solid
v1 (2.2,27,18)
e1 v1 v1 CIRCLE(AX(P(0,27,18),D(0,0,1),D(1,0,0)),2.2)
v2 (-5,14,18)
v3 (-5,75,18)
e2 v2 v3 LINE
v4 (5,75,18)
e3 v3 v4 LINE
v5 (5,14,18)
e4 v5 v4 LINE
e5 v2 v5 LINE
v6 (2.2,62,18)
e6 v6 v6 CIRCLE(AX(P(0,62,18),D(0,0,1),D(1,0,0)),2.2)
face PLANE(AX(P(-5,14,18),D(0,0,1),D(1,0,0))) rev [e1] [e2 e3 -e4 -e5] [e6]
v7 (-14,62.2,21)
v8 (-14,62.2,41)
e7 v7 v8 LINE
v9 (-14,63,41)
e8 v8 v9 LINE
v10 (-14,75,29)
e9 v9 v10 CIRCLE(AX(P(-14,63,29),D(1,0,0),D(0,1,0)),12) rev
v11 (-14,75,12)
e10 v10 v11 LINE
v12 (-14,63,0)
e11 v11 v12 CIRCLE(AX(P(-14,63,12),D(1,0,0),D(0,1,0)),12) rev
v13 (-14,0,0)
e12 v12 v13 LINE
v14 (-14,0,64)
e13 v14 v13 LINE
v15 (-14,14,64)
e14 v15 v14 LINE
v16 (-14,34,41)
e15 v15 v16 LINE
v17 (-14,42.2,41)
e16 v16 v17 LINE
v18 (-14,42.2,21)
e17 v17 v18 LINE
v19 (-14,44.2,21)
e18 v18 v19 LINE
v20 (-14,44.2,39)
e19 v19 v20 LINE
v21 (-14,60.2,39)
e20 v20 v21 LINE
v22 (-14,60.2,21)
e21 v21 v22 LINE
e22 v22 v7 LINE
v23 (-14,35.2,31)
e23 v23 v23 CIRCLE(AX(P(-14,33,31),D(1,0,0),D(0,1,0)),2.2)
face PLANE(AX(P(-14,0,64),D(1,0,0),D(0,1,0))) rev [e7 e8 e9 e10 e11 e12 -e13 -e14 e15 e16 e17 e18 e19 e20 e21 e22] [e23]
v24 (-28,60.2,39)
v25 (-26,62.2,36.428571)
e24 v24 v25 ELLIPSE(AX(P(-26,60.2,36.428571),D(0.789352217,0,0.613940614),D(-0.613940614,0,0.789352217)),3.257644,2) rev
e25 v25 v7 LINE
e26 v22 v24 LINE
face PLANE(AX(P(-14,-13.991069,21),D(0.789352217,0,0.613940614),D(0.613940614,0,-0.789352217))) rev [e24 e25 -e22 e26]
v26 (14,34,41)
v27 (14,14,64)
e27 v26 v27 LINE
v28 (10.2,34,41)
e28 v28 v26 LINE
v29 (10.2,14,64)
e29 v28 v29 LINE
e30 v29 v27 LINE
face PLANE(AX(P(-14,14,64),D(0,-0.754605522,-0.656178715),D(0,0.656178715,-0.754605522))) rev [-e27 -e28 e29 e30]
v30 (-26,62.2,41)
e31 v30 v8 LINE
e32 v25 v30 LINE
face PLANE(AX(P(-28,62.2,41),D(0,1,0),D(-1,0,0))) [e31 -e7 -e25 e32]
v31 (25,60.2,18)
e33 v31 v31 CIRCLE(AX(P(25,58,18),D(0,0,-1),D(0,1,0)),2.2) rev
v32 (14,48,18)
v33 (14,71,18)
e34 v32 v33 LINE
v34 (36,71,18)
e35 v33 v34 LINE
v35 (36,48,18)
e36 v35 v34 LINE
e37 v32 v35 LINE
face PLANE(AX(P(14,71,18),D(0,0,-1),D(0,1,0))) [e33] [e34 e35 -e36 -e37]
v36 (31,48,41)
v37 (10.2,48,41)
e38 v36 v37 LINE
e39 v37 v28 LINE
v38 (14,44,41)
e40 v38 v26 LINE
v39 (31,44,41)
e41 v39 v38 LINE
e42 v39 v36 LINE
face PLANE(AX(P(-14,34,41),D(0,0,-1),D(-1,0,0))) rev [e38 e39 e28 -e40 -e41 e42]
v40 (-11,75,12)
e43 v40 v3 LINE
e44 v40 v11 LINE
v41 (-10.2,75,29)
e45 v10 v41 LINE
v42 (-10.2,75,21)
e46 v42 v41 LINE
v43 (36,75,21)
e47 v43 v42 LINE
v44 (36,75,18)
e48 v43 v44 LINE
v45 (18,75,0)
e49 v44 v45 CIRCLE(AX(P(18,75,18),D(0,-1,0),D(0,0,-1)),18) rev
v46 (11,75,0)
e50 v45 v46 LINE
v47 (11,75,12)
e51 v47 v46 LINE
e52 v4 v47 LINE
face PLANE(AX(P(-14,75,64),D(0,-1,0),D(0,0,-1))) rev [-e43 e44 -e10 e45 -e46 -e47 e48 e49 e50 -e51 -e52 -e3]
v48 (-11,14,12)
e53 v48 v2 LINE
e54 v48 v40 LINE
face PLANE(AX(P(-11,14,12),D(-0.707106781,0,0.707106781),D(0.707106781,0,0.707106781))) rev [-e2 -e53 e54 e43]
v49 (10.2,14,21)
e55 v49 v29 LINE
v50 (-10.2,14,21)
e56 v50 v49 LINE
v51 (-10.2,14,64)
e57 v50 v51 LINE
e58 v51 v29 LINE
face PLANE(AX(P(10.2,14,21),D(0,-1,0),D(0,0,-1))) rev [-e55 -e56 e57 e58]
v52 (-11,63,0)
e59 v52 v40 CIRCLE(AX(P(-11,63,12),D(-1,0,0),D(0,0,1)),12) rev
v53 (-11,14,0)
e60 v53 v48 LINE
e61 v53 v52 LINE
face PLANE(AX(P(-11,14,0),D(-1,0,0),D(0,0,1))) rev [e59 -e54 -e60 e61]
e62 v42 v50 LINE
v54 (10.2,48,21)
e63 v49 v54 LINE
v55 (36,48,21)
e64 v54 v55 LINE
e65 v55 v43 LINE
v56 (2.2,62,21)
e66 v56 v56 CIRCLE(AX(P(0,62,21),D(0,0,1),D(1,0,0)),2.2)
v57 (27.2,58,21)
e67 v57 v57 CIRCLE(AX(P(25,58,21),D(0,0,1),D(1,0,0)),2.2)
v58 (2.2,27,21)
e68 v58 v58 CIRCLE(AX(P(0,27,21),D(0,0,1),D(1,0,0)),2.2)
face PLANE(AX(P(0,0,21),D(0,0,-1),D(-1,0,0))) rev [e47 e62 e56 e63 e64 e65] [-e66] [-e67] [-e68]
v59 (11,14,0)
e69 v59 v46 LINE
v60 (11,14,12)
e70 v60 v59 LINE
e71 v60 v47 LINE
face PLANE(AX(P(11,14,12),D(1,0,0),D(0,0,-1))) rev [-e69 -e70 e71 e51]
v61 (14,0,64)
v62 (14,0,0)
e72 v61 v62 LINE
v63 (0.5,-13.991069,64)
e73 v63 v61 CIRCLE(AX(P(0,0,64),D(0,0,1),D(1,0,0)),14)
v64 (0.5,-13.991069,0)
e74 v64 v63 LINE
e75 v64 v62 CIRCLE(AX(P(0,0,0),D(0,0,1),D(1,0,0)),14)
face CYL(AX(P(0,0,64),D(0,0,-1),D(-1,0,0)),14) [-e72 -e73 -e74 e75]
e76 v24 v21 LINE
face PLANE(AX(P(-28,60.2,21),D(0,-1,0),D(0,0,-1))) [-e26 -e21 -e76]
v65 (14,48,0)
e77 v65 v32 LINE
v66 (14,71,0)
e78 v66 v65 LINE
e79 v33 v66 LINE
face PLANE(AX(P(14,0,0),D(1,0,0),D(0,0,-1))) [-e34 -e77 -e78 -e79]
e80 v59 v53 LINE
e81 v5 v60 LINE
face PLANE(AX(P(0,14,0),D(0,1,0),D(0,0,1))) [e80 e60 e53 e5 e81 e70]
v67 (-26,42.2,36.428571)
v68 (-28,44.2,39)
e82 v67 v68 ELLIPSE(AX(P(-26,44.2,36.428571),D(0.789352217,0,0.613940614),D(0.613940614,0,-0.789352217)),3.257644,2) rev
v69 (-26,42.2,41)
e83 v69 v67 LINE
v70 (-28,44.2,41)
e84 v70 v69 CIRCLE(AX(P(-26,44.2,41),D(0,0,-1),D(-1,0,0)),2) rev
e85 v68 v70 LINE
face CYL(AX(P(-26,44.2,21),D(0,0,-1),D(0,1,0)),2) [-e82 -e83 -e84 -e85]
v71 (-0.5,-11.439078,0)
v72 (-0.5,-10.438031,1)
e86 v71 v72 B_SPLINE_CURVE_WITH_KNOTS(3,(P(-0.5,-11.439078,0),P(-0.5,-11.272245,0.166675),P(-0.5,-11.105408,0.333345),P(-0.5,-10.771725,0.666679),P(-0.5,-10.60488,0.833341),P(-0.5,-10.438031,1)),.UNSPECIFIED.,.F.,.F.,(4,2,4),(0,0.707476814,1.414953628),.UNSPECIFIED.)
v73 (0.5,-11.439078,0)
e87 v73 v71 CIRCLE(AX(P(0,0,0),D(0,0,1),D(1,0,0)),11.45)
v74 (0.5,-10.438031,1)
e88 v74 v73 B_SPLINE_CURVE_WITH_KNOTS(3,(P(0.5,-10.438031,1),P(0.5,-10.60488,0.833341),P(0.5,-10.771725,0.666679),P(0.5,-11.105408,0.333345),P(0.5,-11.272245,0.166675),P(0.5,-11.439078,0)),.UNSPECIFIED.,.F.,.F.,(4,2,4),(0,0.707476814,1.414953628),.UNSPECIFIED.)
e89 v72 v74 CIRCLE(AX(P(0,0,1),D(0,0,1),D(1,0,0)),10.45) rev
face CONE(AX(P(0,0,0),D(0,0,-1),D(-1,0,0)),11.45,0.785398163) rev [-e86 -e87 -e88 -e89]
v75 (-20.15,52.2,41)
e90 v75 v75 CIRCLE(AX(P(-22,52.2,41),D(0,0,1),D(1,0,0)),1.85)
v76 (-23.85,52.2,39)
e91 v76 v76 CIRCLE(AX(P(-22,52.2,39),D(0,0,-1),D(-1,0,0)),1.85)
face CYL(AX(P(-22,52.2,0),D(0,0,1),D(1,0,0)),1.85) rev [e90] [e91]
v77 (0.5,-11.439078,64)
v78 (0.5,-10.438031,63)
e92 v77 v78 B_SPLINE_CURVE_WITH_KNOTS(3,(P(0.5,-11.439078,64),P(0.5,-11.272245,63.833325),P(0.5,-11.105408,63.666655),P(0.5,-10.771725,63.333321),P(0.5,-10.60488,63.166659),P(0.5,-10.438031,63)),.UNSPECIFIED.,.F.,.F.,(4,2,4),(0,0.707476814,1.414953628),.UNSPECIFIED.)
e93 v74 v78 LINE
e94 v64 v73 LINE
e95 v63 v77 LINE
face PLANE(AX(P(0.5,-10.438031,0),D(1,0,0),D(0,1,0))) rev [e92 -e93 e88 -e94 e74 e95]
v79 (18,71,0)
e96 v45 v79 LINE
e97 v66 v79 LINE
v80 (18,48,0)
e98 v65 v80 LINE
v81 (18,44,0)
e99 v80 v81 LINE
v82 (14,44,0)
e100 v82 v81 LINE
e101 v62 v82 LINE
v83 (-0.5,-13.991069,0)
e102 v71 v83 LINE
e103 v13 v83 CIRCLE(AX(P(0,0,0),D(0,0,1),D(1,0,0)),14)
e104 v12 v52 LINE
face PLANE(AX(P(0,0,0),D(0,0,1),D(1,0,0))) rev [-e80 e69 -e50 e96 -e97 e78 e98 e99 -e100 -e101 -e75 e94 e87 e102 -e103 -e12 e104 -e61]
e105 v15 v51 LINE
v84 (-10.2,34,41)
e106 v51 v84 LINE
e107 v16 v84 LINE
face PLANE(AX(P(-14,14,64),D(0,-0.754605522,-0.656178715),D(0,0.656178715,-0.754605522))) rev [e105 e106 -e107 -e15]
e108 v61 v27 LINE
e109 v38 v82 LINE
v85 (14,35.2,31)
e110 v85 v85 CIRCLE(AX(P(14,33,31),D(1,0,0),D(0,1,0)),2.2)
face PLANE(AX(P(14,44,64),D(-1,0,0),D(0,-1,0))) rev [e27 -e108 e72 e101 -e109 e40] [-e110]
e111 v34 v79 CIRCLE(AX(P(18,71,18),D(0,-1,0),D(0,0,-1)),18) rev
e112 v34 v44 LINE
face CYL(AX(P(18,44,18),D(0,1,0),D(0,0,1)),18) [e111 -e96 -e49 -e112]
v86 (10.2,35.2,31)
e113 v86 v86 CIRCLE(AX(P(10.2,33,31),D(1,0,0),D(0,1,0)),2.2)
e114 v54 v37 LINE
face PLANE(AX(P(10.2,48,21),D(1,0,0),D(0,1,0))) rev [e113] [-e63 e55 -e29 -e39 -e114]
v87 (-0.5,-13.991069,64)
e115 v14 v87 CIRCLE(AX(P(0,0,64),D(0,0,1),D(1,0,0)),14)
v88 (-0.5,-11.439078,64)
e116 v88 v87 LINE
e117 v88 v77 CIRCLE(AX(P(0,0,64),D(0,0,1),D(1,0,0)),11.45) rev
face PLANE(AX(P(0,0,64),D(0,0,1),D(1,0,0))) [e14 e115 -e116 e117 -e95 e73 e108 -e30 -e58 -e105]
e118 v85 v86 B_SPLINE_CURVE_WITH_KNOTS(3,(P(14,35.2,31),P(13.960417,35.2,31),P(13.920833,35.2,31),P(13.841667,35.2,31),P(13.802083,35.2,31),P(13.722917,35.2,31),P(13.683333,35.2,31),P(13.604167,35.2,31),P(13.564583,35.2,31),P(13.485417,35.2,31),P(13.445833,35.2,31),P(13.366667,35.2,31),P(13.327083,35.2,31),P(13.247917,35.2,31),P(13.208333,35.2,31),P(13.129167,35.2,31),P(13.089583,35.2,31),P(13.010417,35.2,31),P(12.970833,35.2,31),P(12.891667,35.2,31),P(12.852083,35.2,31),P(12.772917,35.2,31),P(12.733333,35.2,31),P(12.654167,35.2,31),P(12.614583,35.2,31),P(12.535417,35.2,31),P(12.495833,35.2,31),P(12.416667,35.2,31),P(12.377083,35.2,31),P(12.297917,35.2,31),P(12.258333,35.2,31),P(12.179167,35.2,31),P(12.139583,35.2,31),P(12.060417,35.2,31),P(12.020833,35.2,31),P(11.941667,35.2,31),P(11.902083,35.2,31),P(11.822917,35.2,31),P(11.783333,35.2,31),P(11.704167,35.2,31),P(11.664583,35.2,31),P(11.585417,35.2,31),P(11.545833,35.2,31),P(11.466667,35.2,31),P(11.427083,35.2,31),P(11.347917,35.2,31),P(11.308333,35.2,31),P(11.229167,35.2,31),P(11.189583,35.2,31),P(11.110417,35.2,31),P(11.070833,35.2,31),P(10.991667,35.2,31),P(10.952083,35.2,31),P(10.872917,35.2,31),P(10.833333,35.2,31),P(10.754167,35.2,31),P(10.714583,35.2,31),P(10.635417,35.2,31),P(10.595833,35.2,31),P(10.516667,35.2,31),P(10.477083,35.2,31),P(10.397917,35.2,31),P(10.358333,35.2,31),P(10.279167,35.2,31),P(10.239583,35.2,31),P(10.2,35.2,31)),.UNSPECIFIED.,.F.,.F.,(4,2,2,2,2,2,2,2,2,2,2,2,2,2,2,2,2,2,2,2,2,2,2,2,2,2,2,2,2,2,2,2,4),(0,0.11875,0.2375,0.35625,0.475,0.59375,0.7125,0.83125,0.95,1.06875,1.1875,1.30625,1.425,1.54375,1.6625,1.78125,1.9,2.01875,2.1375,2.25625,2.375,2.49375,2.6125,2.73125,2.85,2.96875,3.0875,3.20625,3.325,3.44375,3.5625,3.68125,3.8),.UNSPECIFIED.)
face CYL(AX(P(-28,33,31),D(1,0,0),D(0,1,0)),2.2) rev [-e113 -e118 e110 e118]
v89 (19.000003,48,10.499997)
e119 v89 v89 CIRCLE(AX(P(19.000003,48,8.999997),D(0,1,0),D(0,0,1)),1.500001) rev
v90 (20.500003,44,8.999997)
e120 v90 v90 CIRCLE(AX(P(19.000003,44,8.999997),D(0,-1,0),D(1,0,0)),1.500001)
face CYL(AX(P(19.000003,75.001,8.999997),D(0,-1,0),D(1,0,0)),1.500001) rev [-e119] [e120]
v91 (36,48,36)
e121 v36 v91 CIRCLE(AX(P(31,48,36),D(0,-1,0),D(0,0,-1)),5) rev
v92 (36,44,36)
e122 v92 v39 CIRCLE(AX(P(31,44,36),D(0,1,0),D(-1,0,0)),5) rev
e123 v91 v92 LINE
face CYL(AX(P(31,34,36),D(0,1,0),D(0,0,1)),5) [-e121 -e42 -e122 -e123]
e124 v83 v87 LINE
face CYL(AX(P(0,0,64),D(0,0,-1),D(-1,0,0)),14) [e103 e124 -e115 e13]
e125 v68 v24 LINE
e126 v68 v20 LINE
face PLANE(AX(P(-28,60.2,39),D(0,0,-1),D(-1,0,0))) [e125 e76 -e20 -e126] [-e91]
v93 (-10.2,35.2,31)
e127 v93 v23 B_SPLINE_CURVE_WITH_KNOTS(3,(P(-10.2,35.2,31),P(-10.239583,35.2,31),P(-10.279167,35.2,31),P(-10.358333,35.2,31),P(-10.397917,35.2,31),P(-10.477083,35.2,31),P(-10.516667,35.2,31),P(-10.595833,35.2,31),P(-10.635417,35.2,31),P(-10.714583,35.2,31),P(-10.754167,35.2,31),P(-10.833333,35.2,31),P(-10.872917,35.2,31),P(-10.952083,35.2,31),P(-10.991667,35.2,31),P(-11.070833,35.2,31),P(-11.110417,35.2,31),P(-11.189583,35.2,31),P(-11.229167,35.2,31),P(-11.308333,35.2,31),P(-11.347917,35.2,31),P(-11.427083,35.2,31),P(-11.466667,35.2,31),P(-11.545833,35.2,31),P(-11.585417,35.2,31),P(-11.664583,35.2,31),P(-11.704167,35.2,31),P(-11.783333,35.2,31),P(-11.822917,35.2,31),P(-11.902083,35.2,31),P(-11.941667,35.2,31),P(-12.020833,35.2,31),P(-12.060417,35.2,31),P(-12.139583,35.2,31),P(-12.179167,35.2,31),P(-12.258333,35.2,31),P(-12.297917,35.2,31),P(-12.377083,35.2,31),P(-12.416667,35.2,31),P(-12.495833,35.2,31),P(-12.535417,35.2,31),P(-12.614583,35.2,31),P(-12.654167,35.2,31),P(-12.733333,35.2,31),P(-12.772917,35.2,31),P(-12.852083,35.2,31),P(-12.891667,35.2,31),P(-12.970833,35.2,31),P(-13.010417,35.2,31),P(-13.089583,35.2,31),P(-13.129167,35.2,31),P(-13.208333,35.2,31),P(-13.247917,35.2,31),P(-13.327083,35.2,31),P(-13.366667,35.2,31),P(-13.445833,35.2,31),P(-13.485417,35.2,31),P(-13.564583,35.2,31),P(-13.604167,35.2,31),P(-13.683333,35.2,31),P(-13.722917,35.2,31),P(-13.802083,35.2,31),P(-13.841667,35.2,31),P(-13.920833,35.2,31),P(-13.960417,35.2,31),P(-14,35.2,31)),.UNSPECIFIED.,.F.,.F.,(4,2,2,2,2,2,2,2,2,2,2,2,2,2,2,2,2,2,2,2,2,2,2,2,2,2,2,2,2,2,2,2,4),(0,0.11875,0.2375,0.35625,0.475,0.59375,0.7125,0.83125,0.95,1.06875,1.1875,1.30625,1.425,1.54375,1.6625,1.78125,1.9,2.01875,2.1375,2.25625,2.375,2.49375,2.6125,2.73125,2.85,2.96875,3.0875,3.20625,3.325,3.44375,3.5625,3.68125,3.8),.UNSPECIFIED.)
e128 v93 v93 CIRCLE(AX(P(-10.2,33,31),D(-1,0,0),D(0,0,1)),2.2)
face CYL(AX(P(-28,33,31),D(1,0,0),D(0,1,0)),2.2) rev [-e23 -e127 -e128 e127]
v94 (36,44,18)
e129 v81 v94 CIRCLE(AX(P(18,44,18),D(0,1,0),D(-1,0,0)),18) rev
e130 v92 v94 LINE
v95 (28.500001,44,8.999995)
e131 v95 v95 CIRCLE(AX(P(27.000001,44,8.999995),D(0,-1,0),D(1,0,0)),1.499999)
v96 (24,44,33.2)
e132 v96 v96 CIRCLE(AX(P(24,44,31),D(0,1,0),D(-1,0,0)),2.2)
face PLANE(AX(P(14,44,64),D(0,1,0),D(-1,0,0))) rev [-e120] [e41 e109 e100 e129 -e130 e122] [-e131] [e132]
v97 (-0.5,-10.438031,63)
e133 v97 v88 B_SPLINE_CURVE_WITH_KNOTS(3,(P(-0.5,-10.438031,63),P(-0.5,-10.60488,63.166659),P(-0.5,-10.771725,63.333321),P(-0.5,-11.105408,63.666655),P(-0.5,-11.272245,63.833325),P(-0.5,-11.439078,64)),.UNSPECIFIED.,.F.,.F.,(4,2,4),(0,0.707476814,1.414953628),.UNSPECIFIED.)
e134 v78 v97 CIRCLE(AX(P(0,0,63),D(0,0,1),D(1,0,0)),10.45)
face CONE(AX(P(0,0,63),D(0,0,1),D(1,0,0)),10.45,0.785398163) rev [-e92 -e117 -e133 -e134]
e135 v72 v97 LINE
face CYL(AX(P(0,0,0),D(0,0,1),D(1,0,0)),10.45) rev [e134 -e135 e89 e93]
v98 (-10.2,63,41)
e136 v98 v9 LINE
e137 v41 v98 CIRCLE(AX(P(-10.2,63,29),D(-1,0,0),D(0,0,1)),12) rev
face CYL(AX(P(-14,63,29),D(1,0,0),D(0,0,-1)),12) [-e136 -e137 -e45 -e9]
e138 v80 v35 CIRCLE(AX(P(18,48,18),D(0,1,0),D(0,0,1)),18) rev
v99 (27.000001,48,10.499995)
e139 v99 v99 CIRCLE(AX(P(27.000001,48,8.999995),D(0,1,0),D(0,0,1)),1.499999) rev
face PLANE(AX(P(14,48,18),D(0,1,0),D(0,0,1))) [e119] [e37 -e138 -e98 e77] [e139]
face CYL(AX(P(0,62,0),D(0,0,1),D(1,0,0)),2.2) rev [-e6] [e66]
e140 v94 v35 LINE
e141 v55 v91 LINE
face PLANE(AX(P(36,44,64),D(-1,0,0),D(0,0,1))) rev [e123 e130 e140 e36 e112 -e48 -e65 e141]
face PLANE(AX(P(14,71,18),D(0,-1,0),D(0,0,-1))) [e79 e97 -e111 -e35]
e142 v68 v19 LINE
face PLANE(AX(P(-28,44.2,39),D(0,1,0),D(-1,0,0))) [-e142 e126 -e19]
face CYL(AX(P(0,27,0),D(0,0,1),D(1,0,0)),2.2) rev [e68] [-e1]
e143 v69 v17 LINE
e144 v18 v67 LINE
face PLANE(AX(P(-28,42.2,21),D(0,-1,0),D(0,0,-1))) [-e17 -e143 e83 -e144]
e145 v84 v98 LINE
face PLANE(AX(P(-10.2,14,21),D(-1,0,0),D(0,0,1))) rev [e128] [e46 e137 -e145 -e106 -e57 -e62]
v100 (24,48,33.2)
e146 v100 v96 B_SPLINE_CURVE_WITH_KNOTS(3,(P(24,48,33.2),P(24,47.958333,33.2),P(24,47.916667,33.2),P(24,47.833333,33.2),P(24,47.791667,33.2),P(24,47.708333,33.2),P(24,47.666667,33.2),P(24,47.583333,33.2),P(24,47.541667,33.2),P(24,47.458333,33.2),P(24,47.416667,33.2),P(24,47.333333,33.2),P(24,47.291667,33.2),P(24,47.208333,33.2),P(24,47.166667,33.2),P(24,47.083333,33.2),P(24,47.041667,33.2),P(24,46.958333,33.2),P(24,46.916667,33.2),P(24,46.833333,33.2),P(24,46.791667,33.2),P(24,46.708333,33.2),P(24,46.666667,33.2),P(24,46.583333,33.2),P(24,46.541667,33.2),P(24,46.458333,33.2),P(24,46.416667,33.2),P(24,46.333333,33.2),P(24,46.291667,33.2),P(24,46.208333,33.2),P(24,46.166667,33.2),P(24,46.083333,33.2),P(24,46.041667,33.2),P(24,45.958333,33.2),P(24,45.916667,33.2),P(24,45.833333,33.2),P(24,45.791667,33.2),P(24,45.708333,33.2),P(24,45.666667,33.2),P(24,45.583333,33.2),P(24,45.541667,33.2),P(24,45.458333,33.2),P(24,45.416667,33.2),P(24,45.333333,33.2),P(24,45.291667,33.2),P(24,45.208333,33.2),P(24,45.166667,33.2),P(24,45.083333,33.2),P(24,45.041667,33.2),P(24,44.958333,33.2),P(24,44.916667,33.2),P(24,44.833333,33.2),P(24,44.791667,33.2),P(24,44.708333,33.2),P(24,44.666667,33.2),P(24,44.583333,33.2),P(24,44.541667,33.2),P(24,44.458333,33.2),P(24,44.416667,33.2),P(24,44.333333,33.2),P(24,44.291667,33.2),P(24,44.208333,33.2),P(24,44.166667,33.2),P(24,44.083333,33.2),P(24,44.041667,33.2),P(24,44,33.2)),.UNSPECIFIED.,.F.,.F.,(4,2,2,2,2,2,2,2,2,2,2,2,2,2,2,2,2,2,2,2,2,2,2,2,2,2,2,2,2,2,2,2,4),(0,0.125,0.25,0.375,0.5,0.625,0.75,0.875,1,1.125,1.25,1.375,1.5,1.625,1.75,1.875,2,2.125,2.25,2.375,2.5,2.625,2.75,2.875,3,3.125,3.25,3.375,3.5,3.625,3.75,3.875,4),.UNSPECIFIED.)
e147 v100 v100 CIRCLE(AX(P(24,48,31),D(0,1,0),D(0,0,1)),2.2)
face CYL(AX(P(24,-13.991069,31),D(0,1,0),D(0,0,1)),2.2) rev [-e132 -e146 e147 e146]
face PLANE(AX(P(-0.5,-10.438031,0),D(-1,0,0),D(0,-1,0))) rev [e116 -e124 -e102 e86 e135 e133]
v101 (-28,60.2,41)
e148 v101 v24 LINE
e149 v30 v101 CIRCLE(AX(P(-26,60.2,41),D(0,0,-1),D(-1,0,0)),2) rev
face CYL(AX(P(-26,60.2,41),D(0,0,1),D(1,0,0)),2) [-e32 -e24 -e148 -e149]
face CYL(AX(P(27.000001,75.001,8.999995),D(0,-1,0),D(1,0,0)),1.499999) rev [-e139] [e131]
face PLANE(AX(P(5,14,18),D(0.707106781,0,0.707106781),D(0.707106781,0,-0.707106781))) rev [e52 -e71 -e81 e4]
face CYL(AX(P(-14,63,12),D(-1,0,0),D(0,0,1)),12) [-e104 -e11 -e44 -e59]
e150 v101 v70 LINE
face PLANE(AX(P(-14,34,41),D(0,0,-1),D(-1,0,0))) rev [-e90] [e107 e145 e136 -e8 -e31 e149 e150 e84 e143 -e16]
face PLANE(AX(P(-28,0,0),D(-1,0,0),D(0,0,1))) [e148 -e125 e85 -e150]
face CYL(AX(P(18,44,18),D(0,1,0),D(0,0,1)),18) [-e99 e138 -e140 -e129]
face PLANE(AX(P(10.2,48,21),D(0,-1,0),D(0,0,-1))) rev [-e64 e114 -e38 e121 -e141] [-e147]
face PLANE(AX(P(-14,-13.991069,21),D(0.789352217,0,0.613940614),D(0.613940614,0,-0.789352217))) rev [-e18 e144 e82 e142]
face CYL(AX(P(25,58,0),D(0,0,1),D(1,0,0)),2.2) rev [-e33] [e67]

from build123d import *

# Parameters (mm, degrees)
BOSS_EXTRUDE1_DEPTH     = 64
CUT_EXTRUDE1_DEPTH      = 61
CUT_EXTRUDE2_DEPTH      = 103.493902258
CUT_EXTRUDE2_DEPTH_BACK = 103.493902258
CUT_EXTRUDE3_DEPTH      = 43
CUT_EXTRUDE4_DEPTH      = 105.961897849
CHAMFER1_SIZE           = 1
SKETCH6_R               = 2.2
CUT_EXTRUDE5_DEPTH      = 94.648278148
BOSS_EXTRUDE2_DEPTH     = 14
CUT_EXTRUDE6_DEPTH      = 106.81625079
SKETCH9_R               = 1.85
CUT_EXTRUDE7_DEPTH      = 93.746967605
FILLET1_R               = 2
FILLET2_R               = 12
SKETCH10_R              = 2.2
CUT_EXTRUDE8_DEPTH      = 108.168092266
FILLET3_R               = 5
FILLET4_START           = 44
FILLET4_DEPTH           = 31
SKETCH11_R              = 2.2
CUT_EXTRUDE9_DEPTH      = 97.098348533
SKETCH12_W              = 18
SKETCH12_H              = 23
CUT_EXTRUDE10_DEPTH     = 22
CUT_EXTRUDE11_REACH     = 95.568
SKETCH13_R              = 1.500000659
SKETCH13_R_2            = 1.499999352


with BuildPart() as part:
    # Sketch1 → Boss-Extrude1 (new body)
    with BuildSketch(Plane.XY):
        with BuildLine():
            Line((-14, 0), (-14, 75))
            Line((-14, 75), (36, 75))
            Line((36, 75), (36, 44))
            Line((36, 44), (14, 44))
            Line((14, 44), (14, 0))
            ThreePointArc((14, 0), (0, -14), (-14, 0))
        make_face()
    extrude(amount=BOSS_EXTRUDE1_DEPTH)

    # Sketch2 → Cut-Extrude1 (cut)
    with BuildSketch(Plane(origin=(0, 75, 0), x_dir=(1, 0, 0), z_dir=(0, 1, 0))):
        Polygon((-11, 0), (-11, -12), (-5, -18), (5, -18), (11, -12), (11, 0), align=None)
    extrude(amount=-CUT_EXTRUDE1_DEPTH, mode=Mode.SUBTRACT)

    # Sketch3 → Cut-Extrude2 (cut, two sides: drawn at the far end of the back side and taken through both)
    with BuildSketch(Plane(origin=(14, 0, 0), x_dir=(0, 0, -1), z_dir=(1, 0, 0)).offset(-CUT_EXTRUDE2_DEPTH_BACK)):
        Polygon((-64, 14), (-41, 34), (-41, 75), (-64, 75), align=None)
    extrude(amount=CUT_EXTRUDE2_DEPTH + CUT_EXTRUDE2_DEPTH_BACK, mode=Mode.SUBTRACT)

    # Sketch4 → Cut-Extrude3 (cut)
    with BuildSketch(Plane.XY.offset(64)):
        Polygon((-10.2, 14), (-10.2, 75), (36, 75), (36, 48), (10.2, 48), (10.2, 14), align=None)
    extrude(amount=-CUT_EXTRUDE3_DEPTH, mode=Mode.SUBTRACT)

    # Sketch5 → Cut-Extrude4 (cut, through all)
    with BuildSketch(Plane.XY.offset(64)):
        with BuildLine():
            Line((-0.5, -10.438031424), (-0.5, -13.99106858))
            ThreePointArc((-0.5, -13.99106858), (0, -14), (0.5, -13.99106858))
            Line((0.5, -13.99106858), (0.5, -10.438031424))
            ThreePointArc((0.5, -10.438031424), (0, 10.45), (-0.5, -10.438031424))
        make_face()
    extrude(amount=-CUT_EXTRUDE4_DEPTH, mode=Mode.SUBTRACT)

    # Chamfer1
    chamfer1_edges = [part.edges().sort_by_distance(p)[0] for p in [
        (0, 10.45, 0),
        (0, 10.45, 64),
    ]]
    chamfer(chamfer1_edges, length=CHAMFER1_SIZE)

    # Sketch6 → Cut-Extrude5 (cut, through all)
    with BuildSketch(Plane.XY.offset(21)):
        with Locations((0, 62)):
            Circle(SKETCH6_R)
        with Locations((0, 27)):
            Circle(SKETCH6_R)
        with Locations((25, 58)):
            Circle(SKETCH6_R)
    extrude(amount=-CUT_EXTRUDE5_DEPTH, mode=Mode.SUBTRACT)

    # Sketch7 → Boss-Extrude2 (add)
    with BuildSketch(Plane(origin=(-14, 0, 0), x_dir=(0, 0, -1), z_dir=(1, 0, 0))):
        Polygon((-41, 62.2), (-21, 62.2), (-21, 60.2), (-39, 60.2), (-39, 44.2), (-21, 44.2), (-21, 42.2), (-41, 42.2), align=None)
    extrude(amount=-BOSS_EXTRUDE2_DEPTH)

    # Sketch8 → Cut-Extrude6 (cut, through all)
    with BuildSketch(Plane(origin=(0, 62.2, 0), x_dir=(1, 0, 0), z_dir=(0, 1, 0))):
        Polygon((-14, -21), (-28, -39), (-28, -21), align=None)
    extrude(amount=-CUT_EXTRUDE6_DEPTH, mode=Mode.SUBTRACT)

    # Sketch9 → Cut-Extrude7 (cut, through all)
    with BuildSketch(Plane.XY.offset(41)):
        with Locations((-22, 52.2)):
            Circle(SKETCH9_R)
    extrude(amount=-CUT_EXTRUDE7_DEPTH, mode=Mode.SUBTRACT)

    # Fillet1
    fillet1_edges = [part.edges().sort_by_distance(p)[0] for p in [
        (-28, 42.2, 40),
        (-28, 62.2, 40),
    ]]
    fillet(fillet1_edges, radius=FILLET1_R)

    # Fillet2
    fillet2_edges = [part.edges().sort_by_distance(p)[0] for p in [
        (-12.5, 75, 0),
        (-12.1, 75, 41),
    ]]
    fillet(fillet2_edges, radius=FILLET2_R)

    # Sketch10 → Cut-Extrude8 (cut, through all)
    with BuildSketch(Plane(origin=(14, 0, 0), x_dir=(0, 0, -1), z_dir=(1, 0, 0))):
        with Locations(Location((-31, 33, 0), (0, 0, 90))):
            Circle(SKETCH10_R)
    extrude(amount=-CUT_EXTRUDE8_DEPTH, mode=Mode.SUBTRACT)

    # Fillet3
    fillet3_edges = [part.edges().sort_by_distance(p)[0] for p in [
        (36, 46, 41),
    ]]
    fillet(fillet3_edges, radius=FILLET3_R)

    # Fillet4: read off the stored shape, not the designer's step
    # Fillet4 outline → Fillet4 (cut)
    with BuildSketch(Plane(origin=(0, 0, 0), x_dir=(1, 0, 0), z_dir=(0, 1, 0)).offset(FILLET4_START)):
        with BuildLine():
            ThreePointArc((18, 0), (30.727922061, -5.272077939), (36, -18))
            Line((36, -18), (36, 0))
            Line((36, 0), (18, 0))
        make_face()
    extrude(amount=FILLET4_DEPTH, mode=Mode.SUBTRACT)

    # Sketch11 → Cut-Extrude9 (cut, through all)
    with BuildSketch(Plane(origin=(0, 48, 0), x_dir=(1, 0, 0), z_dir=(0, 1, 0))):
        with Locations(Location((24, -31, 0), (0, 0, 270))):
            Circle(SKETCH11_R)
    extrude(amount=-CUT_EXTRUDE9_DEPTH, mode=Mode.SUBTRACT)

    # Sketch12 → Cut-Extrude10 (cut)
    with BuildSketch(Plane.ZY.offset(-36)):
        with Locations((9, 59.5)):
            Rectangle(SKETCH12_W, SKETCH12_H)
    extrude(amount=CUT_EXTRUDE10_DEPTH, mode=Mode.SUBTRACT)

    # Sketch13 → Cut-Extrude11 (cut, up to next)
    with BuildSketch(Plane.XZ.offset(-44), mode=Mode.PRIVATE) as cut_extrude11_sk1:
        with Locations((19.000002521, 8.999996593)):
            Circle(SKETCH13_R)
    cut_extrude11_tool1 = extrude(cut_extrude11_sk1.sketch, amount=-CUT_EXTRUDE11_REACH, mode=Mode.PRIVATE) & part.part
    # Sketch13 → Cut-Extrude11 (cut, up to next)
    with BuildSketch(Plane.XZ.offset(-44), mode=Mode.PRIVATE) as cut_extrude11_sk2:
        with Locations((27.000001248, 8.999995496)):
            Circle(SKETCH13_R_2)
    cut_extrude11_tool2 = extrude(cut_extrude11_sk2.sketch, amount=-CUT_EXTRUDE11_REACH, mode=Mode.PRIVATE) & part.part
    add(cut_extrude11_tool1.solids().sort_by_distance((19.000003, 44, 8.999997))[0], mode=Mode.SUBTRACT)
    add(cut_extrude11_tool2.solids().sort_by_distance((27.000001, 44, 8.999995))[0], mode=Mode.SUBTRACT)


solid = part.part
